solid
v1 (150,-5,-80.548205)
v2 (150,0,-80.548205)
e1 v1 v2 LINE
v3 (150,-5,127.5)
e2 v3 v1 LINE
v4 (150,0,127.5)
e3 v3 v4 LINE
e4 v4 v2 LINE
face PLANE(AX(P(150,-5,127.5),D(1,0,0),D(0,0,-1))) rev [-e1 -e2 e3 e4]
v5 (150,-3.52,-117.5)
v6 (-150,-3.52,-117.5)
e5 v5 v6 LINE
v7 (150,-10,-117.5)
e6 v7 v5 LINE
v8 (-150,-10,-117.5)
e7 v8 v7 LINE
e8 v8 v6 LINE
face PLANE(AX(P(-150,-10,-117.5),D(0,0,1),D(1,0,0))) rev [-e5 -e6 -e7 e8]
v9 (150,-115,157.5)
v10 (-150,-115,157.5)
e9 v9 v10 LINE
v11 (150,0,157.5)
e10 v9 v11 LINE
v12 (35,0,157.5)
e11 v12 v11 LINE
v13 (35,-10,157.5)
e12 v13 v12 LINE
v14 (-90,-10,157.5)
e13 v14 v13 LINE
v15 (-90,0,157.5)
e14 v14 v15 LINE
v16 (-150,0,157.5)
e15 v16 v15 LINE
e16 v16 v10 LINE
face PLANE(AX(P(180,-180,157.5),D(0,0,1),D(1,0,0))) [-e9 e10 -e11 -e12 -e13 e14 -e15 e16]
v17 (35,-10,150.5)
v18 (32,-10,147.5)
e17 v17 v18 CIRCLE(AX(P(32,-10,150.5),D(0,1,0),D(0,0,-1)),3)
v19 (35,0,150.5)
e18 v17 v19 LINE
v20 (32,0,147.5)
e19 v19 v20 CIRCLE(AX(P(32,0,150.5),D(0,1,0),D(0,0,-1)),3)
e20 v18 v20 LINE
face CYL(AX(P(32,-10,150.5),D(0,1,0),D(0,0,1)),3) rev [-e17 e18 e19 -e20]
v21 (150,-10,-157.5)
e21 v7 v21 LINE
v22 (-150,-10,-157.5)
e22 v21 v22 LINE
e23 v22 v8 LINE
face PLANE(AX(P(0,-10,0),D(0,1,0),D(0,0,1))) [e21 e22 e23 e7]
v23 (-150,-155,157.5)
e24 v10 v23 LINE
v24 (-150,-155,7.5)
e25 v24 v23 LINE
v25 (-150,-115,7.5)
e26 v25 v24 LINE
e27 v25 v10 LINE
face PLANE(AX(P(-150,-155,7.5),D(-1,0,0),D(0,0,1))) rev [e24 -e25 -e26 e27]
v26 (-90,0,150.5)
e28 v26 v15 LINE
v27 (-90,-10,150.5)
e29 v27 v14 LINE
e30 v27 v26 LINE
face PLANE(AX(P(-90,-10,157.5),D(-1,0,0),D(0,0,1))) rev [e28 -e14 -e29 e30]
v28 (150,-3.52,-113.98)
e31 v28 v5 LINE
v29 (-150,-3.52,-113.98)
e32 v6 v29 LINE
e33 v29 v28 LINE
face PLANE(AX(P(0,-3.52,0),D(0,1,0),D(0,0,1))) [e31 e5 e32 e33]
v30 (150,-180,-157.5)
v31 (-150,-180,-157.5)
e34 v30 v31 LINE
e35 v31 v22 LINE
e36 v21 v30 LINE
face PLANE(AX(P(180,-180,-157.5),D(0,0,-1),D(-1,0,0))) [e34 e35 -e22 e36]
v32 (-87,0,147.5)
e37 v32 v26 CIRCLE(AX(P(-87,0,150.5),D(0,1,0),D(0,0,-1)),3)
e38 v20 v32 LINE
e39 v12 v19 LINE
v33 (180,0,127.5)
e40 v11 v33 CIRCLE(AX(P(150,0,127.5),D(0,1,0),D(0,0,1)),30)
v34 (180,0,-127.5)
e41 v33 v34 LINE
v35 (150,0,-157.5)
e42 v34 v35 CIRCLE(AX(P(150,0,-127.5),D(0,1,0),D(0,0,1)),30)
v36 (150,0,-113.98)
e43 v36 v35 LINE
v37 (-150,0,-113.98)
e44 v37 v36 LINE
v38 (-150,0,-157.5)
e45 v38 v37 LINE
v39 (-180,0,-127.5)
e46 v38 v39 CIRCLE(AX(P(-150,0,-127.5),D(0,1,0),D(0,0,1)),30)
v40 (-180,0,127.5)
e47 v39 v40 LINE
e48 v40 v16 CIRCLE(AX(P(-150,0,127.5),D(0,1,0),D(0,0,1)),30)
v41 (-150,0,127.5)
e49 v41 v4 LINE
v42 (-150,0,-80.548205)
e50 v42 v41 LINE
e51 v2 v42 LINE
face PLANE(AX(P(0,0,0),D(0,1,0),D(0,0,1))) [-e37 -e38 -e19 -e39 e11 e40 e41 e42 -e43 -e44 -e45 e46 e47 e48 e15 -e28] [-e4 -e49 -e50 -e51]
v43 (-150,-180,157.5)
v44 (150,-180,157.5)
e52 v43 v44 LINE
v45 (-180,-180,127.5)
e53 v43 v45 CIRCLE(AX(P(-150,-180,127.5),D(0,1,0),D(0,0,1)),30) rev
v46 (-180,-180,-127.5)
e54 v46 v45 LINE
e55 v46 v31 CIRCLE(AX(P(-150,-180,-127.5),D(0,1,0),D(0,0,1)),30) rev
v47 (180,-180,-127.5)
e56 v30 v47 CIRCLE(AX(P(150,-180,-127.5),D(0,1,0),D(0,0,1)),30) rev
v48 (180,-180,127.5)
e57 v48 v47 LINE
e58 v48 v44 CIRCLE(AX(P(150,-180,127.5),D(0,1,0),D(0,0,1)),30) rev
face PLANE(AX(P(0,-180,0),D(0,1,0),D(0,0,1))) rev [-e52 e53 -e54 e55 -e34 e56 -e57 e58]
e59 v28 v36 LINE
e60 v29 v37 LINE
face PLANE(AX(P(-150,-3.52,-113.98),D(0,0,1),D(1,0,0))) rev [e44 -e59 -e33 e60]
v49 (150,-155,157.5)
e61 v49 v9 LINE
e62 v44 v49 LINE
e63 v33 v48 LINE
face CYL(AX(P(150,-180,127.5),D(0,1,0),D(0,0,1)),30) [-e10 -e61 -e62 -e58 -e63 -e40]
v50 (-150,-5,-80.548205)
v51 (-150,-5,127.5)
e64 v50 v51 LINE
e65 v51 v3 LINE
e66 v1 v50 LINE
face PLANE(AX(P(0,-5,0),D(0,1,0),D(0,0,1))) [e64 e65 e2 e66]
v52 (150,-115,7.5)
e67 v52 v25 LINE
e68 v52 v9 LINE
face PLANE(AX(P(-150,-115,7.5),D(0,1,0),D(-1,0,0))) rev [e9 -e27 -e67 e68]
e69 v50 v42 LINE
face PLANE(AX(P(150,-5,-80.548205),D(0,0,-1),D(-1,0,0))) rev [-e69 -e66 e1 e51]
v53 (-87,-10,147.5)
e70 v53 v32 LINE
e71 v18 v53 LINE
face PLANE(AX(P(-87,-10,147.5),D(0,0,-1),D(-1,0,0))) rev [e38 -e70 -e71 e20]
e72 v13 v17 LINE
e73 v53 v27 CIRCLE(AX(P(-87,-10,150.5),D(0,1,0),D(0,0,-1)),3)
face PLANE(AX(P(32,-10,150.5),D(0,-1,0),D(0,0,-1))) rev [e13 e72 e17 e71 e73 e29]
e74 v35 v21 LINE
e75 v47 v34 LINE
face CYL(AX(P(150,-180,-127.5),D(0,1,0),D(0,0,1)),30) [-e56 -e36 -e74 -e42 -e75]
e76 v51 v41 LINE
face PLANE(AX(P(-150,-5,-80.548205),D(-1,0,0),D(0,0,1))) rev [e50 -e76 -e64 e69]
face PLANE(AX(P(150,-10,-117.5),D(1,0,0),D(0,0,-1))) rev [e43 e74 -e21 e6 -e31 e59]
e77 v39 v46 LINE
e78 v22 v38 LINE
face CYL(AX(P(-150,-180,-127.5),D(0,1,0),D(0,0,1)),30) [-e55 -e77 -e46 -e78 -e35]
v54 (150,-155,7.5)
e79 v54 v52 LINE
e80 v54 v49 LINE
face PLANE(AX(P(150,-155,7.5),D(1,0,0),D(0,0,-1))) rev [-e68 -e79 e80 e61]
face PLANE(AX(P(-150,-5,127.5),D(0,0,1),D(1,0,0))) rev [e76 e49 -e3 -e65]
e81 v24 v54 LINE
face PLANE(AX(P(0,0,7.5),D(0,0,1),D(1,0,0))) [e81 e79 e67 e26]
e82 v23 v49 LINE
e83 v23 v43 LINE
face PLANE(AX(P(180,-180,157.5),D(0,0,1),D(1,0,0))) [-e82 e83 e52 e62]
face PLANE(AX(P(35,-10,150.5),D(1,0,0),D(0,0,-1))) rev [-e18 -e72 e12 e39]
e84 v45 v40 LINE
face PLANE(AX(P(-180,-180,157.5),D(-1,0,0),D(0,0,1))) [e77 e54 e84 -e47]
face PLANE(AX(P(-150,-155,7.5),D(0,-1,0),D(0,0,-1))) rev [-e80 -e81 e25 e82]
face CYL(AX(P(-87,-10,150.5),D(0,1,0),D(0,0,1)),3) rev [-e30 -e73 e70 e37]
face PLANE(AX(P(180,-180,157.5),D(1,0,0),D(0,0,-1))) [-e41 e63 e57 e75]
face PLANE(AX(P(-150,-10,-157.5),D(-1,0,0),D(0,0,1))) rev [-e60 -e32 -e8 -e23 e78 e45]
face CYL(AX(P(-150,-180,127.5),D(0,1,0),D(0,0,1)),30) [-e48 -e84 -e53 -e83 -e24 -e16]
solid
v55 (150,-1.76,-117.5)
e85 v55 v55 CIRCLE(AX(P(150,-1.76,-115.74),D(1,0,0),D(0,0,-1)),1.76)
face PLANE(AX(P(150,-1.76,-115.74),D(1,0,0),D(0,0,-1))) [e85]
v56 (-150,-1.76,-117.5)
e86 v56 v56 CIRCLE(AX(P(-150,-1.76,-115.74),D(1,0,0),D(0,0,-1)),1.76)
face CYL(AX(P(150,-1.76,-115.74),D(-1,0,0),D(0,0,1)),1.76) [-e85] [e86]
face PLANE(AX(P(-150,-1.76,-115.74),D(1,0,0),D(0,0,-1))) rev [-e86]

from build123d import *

# Parameters (mm, degrees)
SKETCH1_W           = 360
SKETCH1_H           = 315
BASE_FLANGE1_DEPTH  = 180
FILLET1_R           = 30
SKETCH6_W           = 300
SKETCH6_H           = 40
CUT_EXTRUDE1_DEPTH  = 10
CUT_EXTRUDE2_DEPTH  = 10
SKETCH16_W          = 300
SKETCH16_H          = 3.52
CUT_EXTRUDE3_DEPTH  = 3.52
SKETCH17_R          = 1.76
BOSS_EXTRUDE3_DEPTH = 300
SKETCH18_W          = 300
SKETCH18_H          = 40
CUT_EXTRUDE4_DEPTH  = 150
SKETCH22_W          = 300
SKETCH22_H          = 208.048205441
CUT_EXTRUDE6_DEPTH  = 5


# Sheet-metal steps are written as plain solids
with BuildPart() as part:
    # Sketch1 → Base-Flange1 (new body)
    with BuildSketch(Plane(origin=(0, 0, 0), x_dir=(1, 0, 0), z_dir=(0, 1, 0))):
        Rectangle(SKETCH1_W, SKETCH1_H)
    extrude(amount=-BASE_FLANGE1_DEPTH)

    # Fillet1
    fillet1_edges = [part.edges().sort_by_distance(p)[0] for p in [
        (-180, -90, -157.5),
        (180, -90, -157.5),
        (180, -90, 157.5),
        (-180, -90, 157.5),
    ]]
    fillet(fillet1_edges, radius=FILLET1_R)

    # Sketch6 → Cut-Extrude1 (cut)
    with BuildSketch(Plane(origin=(0, 0, 0), x_dir=(1, 0, 0), z_dir=(0, 1, 0))):
        with Locations((0, 137.5)):
            Rectangle(SKETCH6_W, SKETCH6_H)
    extrude(amount=-CUT_EXTRUDE1_DEPTH, mode=Mode.SUBTRACT)

    # Sketch7 → Cut-Extrude2 (cut)
    with BuildSketch(Plane(origin=(0, 0, 0), x_dir=(1, 0, 0), z_dir=(0, 1, 0))):
        with BuildLine():
            Line((-90, -157.5), (-90, -150.5))
            ThreePointArc((-90, -150.5), (-89.121320344, -148.378679656), (-87, -147.5))
            Line((-87, -147.5), (32, -147.5))
            ThreePointArc((32, -147.5), (34.121320344, -148.378679656), (35, -150.5))
            Line((35, -150.5), (35, -157.5))
            Line((35, -157.5), (-90, -157.5))
        make_face()
    extrude(amount=-CUT_EXTRUDE2_DEPTH, mode=Mode.SUBTRACT)

    # Sketch16 → Cut-Extrude3 (cut)
    with BuildSketch(Plane(origin=(0, 0, 0), x_dir=(1, 0, 0), z_dir=(0, 1, 0))):
        with Locations((0, 115.74)):
            Rectangle(SKETCH16_W, SKETCH16_H)
    extrude(amount=-CUT_EXTRUDE3_DEPTH, mode=Mode.SUBTRACT)

    # Sketch18 → Cut-Extrude4 (cut)
    with BuildSketch(Plane.XY.offset(157.5)):
        with Locations((0, -135)):
            Rectangle(SKETCH18_W, SKETCH18_H)
    extrude(amount=-CUT_EXTRUDE4_DEPTH, mode=Mode.SUBTRACT)

    # Sketch22 → Cut-Extrude6 (cut)
    with BuildSketch(Plane(origin=(0, 0, 0), x_dir=(1, 0, 0), z_dir=(0, 1, 0))):
        with Locations((0, -23.47589728)):
            Rectangle(SKETCH22_W, SKETCH22_H)
    extrude(amount=-CUT_EXTRUDE6_DEPTH, mode=Mode.SUBTRACT)


with BuildPart() as body_2:
    # Sketch17 → Boss-Extrude3 (new body)
    with BuildSketch(Plane(origin=(-150, 0, 0), x_dir=(0, 0, -1), z_dir=(1, 0, 0))):
        with Locations((115.74, -1.76)):
            Circle(SKETCH17_R)
    extrude(amount=BOSS_EXTRUDE3_DEPTH)


solid = Compound([part.part, body_2.part])
